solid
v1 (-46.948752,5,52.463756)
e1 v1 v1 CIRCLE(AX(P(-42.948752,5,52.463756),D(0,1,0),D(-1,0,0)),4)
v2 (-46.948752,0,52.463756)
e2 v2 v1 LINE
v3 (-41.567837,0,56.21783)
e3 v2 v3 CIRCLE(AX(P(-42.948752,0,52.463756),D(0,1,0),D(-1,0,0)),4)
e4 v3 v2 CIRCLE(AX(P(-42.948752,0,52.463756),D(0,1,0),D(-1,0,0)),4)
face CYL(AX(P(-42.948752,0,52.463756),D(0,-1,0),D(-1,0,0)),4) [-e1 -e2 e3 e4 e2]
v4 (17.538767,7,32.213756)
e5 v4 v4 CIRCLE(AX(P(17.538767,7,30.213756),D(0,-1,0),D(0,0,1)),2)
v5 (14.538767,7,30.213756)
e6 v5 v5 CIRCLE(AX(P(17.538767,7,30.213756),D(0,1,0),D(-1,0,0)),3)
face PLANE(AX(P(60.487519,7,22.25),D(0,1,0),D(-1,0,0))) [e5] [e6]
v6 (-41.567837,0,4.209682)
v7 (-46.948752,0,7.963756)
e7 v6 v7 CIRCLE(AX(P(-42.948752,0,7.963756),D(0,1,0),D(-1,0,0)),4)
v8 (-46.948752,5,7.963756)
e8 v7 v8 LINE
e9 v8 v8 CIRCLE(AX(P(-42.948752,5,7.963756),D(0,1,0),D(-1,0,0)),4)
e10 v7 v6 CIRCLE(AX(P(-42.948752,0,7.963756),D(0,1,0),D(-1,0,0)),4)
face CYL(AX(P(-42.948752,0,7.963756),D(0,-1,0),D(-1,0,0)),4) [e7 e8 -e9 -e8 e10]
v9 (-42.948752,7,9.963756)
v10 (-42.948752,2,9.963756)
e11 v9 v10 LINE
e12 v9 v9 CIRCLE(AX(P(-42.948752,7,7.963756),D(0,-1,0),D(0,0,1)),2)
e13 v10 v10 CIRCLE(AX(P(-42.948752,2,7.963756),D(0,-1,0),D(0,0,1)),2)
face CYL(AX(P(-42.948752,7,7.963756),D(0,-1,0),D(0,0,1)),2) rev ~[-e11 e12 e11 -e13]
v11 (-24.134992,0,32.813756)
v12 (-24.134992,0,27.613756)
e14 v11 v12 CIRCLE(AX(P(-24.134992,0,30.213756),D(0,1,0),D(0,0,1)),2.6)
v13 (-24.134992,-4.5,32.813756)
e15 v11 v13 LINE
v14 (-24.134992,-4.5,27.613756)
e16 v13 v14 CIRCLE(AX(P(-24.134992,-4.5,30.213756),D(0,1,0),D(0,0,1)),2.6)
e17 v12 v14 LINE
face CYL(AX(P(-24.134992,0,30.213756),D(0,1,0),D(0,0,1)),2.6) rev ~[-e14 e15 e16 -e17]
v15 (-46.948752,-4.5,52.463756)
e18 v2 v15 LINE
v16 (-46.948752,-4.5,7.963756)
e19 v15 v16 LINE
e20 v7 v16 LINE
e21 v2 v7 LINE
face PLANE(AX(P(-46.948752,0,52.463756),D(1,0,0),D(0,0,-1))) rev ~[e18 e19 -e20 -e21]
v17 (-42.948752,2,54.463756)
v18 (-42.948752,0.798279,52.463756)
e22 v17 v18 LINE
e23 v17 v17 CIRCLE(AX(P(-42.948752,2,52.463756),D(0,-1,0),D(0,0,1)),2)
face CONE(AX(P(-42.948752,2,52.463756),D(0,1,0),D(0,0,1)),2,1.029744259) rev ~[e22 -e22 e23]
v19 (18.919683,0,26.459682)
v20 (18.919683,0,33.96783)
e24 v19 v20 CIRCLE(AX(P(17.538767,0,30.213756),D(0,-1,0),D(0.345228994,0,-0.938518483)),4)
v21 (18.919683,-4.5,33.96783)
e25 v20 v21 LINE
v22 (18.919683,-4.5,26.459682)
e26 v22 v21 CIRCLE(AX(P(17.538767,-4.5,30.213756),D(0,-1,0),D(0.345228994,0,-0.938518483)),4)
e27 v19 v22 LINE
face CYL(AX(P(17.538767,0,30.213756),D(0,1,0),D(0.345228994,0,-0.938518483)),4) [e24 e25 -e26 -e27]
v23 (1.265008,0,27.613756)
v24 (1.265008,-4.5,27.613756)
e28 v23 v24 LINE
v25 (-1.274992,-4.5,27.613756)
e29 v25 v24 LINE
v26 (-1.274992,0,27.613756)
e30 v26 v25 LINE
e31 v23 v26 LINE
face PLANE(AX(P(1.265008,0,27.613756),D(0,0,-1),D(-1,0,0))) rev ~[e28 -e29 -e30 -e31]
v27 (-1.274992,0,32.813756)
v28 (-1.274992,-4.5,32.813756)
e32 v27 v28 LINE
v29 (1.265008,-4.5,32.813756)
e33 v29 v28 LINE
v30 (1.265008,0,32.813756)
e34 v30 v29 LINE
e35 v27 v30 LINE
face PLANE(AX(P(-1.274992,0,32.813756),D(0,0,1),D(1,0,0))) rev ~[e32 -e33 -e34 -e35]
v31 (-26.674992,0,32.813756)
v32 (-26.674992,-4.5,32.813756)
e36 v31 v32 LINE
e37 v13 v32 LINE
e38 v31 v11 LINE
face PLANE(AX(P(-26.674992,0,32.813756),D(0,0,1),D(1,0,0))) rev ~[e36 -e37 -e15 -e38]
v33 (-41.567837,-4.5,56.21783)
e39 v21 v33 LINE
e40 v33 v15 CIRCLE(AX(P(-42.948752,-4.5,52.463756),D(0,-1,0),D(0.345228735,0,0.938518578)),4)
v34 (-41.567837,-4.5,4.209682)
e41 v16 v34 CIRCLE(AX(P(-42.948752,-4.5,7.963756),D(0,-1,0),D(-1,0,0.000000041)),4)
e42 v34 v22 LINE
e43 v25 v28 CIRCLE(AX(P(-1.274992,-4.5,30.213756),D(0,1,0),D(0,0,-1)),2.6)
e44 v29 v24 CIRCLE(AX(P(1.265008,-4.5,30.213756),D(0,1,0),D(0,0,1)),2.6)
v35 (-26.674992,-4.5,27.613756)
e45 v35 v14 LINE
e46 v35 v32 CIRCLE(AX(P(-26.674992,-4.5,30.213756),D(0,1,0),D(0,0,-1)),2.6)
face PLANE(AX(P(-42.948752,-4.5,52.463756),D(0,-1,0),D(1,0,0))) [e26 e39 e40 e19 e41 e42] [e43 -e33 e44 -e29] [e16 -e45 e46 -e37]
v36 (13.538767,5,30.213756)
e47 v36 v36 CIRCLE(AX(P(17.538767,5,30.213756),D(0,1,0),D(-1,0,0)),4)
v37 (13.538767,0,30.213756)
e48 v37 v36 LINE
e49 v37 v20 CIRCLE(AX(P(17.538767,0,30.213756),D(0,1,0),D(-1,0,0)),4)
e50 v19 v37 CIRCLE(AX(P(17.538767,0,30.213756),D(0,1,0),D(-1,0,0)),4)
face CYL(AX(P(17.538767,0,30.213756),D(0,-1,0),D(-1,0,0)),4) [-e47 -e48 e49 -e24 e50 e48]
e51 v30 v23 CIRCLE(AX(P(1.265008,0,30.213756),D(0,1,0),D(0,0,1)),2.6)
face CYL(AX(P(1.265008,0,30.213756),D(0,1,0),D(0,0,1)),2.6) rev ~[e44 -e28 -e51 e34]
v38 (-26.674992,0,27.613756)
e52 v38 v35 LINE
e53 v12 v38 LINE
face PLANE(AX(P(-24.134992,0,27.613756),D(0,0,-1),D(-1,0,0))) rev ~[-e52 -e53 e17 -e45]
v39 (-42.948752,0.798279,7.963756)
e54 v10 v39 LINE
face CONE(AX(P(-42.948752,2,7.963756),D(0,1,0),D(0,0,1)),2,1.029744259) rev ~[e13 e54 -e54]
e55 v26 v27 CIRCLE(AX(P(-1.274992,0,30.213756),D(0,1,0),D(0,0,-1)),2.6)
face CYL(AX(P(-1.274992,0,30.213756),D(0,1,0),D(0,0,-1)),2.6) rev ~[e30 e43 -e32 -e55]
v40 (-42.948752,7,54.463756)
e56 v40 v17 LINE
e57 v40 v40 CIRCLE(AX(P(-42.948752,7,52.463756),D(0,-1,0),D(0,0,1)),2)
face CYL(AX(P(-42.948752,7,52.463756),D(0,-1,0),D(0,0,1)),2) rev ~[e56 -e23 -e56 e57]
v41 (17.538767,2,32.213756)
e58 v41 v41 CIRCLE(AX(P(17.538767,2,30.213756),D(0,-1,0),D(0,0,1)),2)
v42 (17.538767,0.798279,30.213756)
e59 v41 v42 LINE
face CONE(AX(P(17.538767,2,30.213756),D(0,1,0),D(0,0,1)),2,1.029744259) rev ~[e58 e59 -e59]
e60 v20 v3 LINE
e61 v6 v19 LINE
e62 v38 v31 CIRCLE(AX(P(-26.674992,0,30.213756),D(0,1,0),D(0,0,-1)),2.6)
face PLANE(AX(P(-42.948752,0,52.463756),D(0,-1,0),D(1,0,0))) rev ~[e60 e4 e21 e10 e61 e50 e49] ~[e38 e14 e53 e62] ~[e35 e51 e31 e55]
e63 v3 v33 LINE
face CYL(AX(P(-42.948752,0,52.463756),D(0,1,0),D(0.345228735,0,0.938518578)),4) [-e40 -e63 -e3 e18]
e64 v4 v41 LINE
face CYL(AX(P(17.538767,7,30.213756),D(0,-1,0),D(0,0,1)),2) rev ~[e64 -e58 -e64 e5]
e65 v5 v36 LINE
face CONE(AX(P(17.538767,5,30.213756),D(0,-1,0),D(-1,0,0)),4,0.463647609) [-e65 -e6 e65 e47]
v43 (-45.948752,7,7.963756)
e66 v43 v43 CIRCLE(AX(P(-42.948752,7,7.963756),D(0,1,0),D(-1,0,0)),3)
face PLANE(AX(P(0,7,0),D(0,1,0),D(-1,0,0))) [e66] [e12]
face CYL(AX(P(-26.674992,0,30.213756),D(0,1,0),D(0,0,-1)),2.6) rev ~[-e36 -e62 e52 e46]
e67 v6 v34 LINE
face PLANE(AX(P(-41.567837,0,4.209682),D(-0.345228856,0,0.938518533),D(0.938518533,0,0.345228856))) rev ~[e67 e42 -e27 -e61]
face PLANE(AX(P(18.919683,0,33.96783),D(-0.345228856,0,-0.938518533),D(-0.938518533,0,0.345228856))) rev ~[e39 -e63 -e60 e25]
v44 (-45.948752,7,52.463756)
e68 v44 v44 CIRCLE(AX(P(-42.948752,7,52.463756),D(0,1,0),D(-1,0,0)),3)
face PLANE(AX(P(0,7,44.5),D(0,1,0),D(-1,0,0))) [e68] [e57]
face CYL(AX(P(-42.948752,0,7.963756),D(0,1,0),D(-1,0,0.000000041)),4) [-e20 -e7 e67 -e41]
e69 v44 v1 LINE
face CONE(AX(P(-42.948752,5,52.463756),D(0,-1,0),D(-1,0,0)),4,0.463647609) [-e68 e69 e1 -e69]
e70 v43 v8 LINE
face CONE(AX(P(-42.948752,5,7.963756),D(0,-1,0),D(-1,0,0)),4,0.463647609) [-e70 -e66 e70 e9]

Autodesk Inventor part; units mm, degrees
ref_plane "YZ Plane" through (0, 0, 0) normal (1, 0, 0) x (0, 1, 0)
ref_plane "XZ Plane" through (0, 0, 0) normal (0, 1, 0) x (-1, 0, 0)
ref_plane "XY Plane" through (0, 0, 0) normal (0, 0, 1) x (1, 0, 0)
sketch "Connector Hole Layout" plane through (0, 0, 0) normal (0, 1, 0) x (-1, 0, 0)
  circle A0 centre (42.948752, 7.963756) radius 1.6 construction
  circle A1 centre (-17.538767, 30.213756) radius 1.6 construction
  circle A2 centre (42.948752, 52.463756) radius 1.6 construction
  line L0 (42.948752, 7.963756) -> (42.948752, 52.463756) construction
  line L1 (41.447122, 51.91139) -> (-16.037138, 30.766122) construction
  point P0 (42.948752, 30.213756)
  dimension "d0" = 3.2
  dimension "d22" = 44.5
  dimension "d23" = 61.25
sketch "Sketch8" plane through (0, 0, 0) normal (0, 1, 0) x (-1, 0, 0)
  circle A0 centre (42.948752, 7.963756) radius 1.6 construction
  circle A1 centre (42.948752, 52.463756) radius 1.6 construction
  circle A2 centre (-17.538767, 30.213756) radius 1.6 construction
  circle A3 centre (42.948752, 7.963756) radius 4
  point P0 (0, 0)
  dimension "d51" = 8
sketch "Sketch8 outline for Extrusion5" plane through (0, 0, 0) normal (0, 1, 0) x (-1, 0, 0)
  circle A0 centre (42.948752, 7.963756) radius 4
extrude "Extrusion5" add sketch "Sketch8 outline for Extrusion5" along normal blind 7
sketch "Sketch9" plane through (-42.948752, 7, 7.963756) normal (0, 1, 0) x (1, 0, 0)
  point P0 (42.948752, 7.963756)
  point P1 (0, 0)
hole "Hole2" at (-42.948752, 7, 7.963756) direction (0, -1, 0) diameter 4 depth 5 tip angle 118
chamfer "Chamfer3" distance 1 distance2 2 1 edges at (-38.9488, 7, 7.9638) measured on face at (-46.2385, 7, 7.5643)
pattern_sketch "Sketch Driven Pattern1" from (-42.948752, 0, 7.963756) copies at (-42.948752, 0, 52.463756) at (17.538767, 0, 30.213756)
sketch "Sketch10" plane through (-42.948752, 0, 52.463756) normal (0, -1, 0) x (1, 0, 0)
  circle A0 centre (0, 0) radius 4
  line L0 (1.380915, 3.754074) -> (61.868435, -18.495926)
  circle A1 centre (60.487519, -22.25) radius 4
  line L1 (61.868435, -26.004074) -> (1.380915, -48.254074)
  circle A2 centre (0, -44.5) radius 4
  line L2 (-4, -44.5) -> (-4, 0)
  circle A3 centre (0, 0) radius 4
  circle A4 centre (0, -44.5) radius 4
  point P0 (42.948752, -52.463756)
sketch "Sketch10 outline for Extrusion6" plane through (-42.948752, 0, 52.463756) normal (0, -1, 0) x (1, 0, 0)
  line L0 (-4, 0) -> (-4, -44.5)
  arc A0 (1.380915, 3.754074) -> (-4, 0) centre (0, 0) ccw
  line L1 (61.868435, -18.495926) -> (1.380915, 3.754074)
  arc A1 (61.868435, -26.004074) -> (61.868435, -18.495926) centre (60.487519, -22.25) ccw
  line L2 (1.380915, -48.254074) -> (61.868435, -26.004074)
  arc A2 (-4, -44.5) -> (1.380915, -48.254074) centre (0, -44.5) ccw
extrude "Extrusion6" add sketch "Sketch10 outline for Extrusion6" along normal blind 4.5
sketch "Sketch11" plane through (-42.948752, 0, 52.463756) normal (0, 1, 0) x (1, 0, 0)
  line L0 (-4, 48.5) -> (64.487519, 48.5) construction
  line L1 (64.487519, 48.5) -> (64.487519, -4) construction
  line L2 (64.487519, -4) -> (-4, -4) construction
  line L3 (-4, -4) -> (-4, 48.5) construction
  circle A0 centre (60.487519, 22.25) radius 4 construction
  circle A1 centre (0, 0) radius 4 construction
  circle A2 centre (0, 44.5) radius 4 construction
  line L4 (30.24376, 48.5) -> (30.24376, -4) construction
  line L5 (-4, 22.25) -> (64.487519, 22.25) construction
  line L6 (16.27376, 22.25) -> (18.81376, 22.25) construction
  line L7 (16.27376, 19.65) -> (18.81376, 19.65)
  line L8 (18.81376, 24.85) -> (16.27376, 24.85)
  arc A3 (16.27376, 24.85) -> (16.27376, 19.65) centre (16.27376, 22.25) ccw
  arc A4 (18.81376, 19.65) -> (18.81376, 24.85) centre (18.81376, 22.25) ccw
  line L9 (44.21376, 19.65) -> (41.67376, 19.65)
  line L10 (41.67376, 24.85) -> (44.21376, 24.85)
  arc A5 (44.21376, 19.65) -> (44.21376, 24.85) centre (44.21376, 22.25) ccw
  arc A6 (41.67376, 24.85) -> (41.67376, 19.65) centre (41.67376, 22.25) ccw
  point P0 (42.948752, 52.463756)
  point P1 (30.24376, 22.25)
  point P2 (30.24376, 22.25)
  point P3 (17.54376, 22.25)
  point P4 (17.54376, 24.85)
  point P5 (17.54376, 19.65)
  dimension "d66" = 11.43
  dimension "d67" = 13.97
  dimension "d68" = 5.2
sketch "Sketch11 outline for Extrusion7" plane through (-42.948752, 0, 52.463756) normal (0, 1, 0) x (1, 0, 0)
  arc A0 (44.21376, 19.65) -> (44.21376, 24.85) centre (44.21376, 22.25) ccw
  line L0 (41.67376, 19.65) -> (44.21376, 19.65)
  arc A1 (41.67376, 24.85) -> (41.67376, 19.65) centre (41.67376, 22.25) ccw
  line L1 (44.21376, 24.85) -> (41.67376, 24.85)
  line L2 (16.27376, 19.65) -> (18.81376, 19.65)
  arc A2 (16.27376, 24.85) -> (16.27376, 19.65) centre (16.27376, 22.25) ccw
  line L3 (18.81376, 24.85) -> (16.27376, 24.85)
  arc A3 (18.81376, 19.65) -> (18.81376, 24.85) centre (18.81376, 22.25) ccw
extrude "Extrusion7" cut sketch "Sketch11 outline for Extrusion7" against normal blind 10
properties part number "db-25_standoffs_plate_t-slot-2inx1in"
